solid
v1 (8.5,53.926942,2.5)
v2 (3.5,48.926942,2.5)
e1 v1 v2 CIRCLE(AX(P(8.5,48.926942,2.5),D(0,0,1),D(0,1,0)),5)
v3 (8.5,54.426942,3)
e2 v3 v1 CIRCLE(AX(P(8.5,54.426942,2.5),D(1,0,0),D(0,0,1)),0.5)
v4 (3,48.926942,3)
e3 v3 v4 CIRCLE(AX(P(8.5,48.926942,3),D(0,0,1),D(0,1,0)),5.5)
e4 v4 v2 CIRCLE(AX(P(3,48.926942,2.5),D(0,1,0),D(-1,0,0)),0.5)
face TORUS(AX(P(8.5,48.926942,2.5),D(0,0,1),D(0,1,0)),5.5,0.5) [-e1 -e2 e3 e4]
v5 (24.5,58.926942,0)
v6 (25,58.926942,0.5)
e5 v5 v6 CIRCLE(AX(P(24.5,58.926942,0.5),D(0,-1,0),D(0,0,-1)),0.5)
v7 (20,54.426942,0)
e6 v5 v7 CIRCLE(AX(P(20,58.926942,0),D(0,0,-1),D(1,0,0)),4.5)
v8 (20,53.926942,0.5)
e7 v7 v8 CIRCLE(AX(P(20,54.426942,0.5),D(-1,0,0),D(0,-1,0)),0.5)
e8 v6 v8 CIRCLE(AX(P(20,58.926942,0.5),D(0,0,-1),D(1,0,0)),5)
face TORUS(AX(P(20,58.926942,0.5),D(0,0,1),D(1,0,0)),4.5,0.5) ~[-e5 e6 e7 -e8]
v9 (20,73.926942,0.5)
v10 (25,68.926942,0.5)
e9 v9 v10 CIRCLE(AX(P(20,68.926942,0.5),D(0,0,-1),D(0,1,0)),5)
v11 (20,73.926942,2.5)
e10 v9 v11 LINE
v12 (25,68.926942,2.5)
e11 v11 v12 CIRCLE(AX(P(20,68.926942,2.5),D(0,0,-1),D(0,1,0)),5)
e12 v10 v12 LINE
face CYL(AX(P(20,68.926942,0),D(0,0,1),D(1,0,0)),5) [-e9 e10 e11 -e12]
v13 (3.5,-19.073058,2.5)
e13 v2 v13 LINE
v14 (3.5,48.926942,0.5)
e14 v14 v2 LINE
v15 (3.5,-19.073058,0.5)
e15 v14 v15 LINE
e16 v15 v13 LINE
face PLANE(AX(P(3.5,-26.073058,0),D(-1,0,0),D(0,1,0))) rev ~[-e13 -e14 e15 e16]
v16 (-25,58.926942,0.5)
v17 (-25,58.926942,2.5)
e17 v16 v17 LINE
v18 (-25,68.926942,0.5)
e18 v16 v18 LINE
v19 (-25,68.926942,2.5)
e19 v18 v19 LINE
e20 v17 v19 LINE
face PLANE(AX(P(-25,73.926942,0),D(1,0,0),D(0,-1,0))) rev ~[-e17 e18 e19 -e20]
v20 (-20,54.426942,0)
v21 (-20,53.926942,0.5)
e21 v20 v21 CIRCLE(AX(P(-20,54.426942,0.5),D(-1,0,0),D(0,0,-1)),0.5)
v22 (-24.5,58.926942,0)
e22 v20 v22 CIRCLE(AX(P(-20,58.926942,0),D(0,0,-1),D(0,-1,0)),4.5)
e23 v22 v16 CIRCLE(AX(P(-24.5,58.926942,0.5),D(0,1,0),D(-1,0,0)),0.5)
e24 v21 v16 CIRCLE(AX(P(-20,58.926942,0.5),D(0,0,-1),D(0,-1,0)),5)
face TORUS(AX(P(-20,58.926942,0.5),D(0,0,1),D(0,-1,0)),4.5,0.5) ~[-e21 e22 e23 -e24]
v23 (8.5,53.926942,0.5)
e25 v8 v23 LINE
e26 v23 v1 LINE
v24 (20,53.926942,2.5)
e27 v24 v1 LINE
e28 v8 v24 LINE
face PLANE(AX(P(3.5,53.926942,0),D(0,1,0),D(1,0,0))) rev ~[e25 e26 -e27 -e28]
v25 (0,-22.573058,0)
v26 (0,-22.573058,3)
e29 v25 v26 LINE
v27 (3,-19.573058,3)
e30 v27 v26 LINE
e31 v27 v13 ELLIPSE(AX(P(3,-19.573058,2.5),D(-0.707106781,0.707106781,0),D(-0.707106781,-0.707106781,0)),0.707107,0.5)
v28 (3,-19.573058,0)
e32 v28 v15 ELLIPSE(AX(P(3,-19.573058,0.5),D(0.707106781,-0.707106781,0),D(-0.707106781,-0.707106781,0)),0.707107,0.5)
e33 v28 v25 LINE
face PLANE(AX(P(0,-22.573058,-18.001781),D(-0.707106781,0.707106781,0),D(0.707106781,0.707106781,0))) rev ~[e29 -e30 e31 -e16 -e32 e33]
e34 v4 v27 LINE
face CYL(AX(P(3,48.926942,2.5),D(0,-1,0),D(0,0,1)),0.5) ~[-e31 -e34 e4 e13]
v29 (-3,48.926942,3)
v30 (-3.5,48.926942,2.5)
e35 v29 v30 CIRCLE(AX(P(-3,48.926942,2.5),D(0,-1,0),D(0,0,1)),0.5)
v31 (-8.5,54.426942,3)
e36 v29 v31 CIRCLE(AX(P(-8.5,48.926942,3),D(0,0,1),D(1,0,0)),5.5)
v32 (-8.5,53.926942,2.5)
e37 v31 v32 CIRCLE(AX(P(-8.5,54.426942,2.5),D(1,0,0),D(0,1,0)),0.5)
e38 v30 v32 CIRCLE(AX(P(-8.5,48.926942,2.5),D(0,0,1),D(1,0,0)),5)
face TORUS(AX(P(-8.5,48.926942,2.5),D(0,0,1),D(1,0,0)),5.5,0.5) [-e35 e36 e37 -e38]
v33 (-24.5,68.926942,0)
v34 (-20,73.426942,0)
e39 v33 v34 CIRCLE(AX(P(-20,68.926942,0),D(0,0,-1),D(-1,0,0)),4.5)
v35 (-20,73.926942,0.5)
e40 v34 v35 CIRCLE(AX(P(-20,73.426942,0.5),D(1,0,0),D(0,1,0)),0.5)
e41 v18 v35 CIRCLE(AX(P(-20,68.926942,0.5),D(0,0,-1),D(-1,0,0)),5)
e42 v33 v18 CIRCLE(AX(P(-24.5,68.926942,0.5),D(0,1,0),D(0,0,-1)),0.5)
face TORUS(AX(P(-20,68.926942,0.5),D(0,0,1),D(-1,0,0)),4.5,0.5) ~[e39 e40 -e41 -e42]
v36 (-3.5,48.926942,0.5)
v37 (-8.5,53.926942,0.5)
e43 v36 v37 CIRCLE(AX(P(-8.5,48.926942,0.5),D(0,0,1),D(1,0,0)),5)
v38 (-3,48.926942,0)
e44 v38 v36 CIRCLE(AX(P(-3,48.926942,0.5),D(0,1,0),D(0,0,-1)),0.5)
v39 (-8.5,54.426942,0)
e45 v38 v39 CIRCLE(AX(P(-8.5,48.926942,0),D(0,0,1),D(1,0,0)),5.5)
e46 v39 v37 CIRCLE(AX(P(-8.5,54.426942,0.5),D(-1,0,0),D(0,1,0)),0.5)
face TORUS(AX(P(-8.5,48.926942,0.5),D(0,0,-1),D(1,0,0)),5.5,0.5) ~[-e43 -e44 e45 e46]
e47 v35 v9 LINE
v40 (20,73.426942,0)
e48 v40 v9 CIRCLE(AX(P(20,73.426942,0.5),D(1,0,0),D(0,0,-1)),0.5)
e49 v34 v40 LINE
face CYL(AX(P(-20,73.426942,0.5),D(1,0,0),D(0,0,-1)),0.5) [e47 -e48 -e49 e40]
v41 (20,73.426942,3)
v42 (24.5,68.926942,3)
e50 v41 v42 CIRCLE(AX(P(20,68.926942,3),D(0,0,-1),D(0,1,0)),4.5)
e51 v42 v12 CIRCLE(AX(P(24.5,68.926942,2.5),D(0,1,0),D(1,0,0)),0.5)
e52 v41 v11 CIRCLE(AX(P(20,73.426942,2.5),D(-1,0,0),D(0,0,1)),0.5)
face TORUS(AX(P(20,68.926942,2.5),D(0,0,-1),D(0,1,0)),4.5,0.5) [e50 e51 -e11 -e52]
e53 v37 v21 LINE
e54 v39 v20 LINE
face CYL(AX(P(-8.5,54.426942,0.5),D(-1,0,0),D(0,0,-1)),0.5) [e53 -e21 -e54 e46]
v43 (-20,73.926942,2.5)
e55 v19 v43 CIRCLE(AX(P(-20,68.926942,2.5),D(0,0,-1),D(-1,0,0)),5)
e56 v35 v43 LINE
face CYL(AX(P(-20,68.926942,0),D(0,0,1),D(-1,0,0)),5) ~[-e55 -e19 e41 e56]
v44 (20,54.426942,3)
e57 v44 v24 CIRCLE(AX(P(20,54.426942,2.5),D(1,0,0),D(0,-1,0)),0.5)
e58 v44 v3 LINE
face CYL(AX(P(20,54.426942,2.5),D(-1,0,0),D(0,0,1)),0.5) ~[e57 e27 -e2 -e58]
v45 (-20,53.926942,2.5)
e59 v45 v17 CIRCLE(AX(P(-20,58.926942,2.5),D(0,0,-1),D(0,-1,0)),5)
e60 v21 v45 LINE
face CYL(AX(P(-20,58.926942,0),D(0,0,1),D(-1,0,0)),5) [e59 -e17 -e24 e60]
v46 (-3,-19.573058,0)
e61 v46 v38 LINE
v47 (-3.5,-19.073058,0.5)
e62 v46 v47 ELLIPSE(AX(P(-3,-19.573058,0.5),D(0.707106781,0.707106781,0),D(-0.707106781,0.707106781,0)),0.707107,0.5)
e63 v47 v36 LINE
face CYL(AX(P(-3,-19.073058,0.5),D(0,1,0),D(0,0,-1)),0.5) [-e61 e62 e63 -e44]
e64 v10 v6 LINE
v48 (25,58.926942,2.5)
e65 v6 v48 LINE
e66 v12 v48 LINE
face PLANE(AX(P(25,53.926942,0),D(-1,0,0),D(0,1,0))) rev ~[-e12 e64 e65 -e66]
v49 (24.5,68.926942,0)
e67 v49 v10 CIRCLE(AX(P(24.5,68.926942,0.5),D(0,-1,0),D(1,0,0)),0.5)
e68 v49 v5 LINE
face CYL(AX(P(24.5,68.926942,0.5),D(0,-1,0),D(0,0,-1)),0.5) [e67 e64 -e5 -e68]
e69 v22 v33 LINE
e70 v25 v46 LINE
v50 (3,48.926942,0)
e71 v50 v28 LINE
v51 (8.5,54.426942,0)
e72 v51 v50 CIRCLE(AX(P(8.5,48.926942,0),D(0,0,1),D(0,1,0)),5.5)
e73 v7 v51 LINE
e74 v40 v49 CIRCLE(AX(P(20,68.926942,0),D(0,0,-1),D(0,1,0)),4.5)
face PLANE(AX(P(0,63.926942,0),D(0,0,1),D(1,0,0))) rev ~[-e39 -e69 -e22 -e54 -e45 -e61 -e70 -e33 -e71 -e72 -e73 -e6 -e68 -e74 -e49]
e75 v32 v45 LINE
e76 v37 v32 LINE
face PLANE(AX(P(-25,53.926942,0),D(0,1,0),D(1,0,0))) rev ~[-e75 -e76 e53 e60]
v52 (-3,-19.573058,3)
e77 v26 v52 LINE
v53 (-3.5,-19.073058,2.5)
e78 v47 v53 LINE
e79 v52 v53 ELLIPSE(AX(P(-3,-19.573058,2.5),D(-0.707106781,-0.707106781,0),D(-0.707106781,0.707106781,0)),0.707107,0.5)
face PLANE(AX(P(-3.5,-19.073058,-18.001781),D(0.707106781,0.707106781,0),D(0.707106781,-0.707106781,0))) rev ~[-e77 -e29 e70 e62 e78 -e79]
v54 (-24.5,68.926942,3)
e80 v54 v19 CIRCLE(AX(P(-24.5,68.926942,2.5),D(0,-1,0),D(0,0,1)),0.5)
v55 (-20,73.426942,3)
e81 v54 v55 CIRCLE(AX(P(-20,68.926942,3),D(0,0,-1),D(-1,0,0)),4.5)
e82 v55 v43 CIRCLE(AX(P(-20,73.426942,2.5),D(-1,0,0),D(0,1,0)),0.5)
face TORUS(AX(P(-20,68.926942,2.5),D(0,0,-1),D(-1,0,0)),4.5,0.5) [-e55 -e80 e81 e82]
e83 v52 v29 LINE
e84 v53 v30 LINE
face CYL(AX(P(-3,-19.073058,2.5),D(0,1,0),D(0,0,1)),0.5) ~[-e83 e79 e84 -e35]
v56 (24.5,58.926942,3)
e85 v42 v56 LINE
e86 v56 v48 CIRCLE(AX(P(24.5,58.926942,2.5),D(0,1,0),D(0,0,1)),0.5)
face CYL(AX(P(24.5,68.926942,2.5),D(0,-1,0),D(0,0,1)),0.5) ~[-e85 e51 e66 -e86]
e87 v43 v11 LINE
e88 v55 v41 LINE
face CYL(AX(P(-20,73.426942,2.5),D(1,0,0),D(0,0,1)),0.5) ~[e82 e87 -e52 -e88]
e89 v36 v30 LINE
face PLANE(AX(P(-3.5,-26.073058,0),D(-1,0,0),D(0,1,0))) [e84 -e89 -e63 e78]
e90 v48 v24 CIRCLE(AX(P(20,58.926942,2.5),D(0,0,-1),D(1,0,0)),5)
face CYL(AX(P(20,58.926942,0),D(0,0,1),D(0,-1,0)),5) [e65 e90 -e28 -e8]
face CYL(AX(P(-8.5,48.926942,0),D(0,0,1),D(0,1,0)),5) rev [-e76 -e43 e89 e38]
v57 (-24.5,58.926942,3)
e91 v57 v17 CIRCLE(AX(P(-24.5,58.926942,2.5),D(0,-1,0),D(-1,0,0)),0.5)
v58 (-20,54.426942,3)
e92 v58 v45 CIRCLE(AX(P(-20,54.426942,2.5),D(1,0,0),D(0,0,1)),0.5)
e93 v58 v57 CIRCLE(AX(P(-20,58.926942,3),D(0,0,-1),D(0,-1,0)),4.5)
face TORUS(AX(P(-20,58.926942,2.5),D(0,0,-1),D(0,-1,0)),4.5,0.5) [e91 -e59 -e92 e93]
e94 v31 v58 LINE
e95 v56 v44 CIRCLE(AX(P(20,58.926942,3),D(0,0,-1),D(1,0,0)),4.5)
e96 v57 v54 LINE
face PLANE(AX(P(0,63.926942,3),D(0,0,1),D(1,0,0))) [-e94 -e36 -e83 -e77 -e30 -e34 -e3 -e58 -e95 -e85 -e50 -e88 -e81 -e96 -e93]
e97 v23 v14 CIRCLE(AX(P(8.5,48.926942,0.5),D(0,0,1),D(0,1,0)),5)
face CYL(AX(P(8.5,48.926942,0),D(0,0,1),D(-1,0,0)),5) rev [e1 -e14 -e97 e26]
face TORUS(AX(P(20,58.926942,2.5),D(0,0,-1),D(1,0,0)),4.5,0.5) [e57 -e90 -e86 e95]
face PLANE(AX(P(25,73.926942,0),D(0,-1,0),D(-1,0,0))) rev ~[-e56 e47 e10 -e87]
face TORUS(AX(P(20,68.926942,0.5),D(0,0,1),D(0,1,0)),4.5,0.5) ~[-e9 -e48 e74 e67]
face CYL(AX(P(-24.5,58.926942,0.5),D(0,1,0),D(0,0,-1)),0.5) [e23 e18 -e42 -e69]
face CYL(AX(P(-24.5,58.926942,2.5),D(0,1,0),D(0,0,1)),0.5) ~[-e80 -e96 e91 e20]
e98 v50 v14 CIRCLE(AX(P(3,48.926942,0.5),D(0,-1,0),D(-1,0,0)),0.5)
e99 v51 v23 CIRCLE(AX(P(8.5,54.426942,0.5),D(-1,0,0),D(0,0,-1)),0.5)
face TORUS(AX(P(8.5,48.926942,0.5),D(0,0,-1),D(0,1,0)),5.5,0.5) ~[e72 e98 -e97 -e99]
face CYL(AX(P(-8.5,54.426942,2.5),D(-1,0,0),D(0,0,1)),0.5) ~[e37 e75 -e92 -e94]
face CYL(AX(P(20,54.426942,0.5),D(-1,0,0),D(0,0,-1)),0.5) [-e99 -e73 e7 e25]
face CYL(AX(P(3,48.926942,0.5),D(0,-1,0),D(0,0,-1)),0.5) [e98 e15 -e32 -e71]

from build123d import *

# Parameters (mm, degrees)
F0_W        = 7
F0_H        = 80
F1_DEPTH    = 3
F2_R        = 5
F3_T1_DEPTH = 39.0035618315
F4_R        = 0.5


# Not quite as in the source:
# - a fillet or chamfer that OpenCascade refuses, or shapes differently, is made with other operations: its cross-section is extruded or revolved along the edge and cut away or added


with BuildPart() as f1:
    # F0 (on Top) → F1 (new body)
    with BuildSketch(Plane.XY):
        Polygon((-25, 73.9269424736), (-25, 53.9269424736), (-3.5, 53.9269424736), (3.5, 53.9269424736), (25, 53.9269424736), (25, 73.9269424736), align=None)
        with Locations((0, 13.9269424736)):
            Rectangle(F0_W, F0_H)
    extrude(amount=F1_DEPTH)

    # F2
    f2_edges = [f1.edges().sort_by_distance(p)[0] for p in [
        (-25, 73.926942, 1.5),
        (25, 73.926942, 1.5),
        (25, 53.926942, 1.5),
        (3.5, 53.926942, 1.5),
        (-3.5, 53.926942, 1.5),
        (-25, 53.926942, 1.5),
    ]]
    fillet(f2_edges, radius=F2_R)

    # F3: chamfer of 7 on 2 edges, made by hand

    # F3_s2 → F3_t1 (cut)
    with BuildSketch(Plane.XY.offset(-18.0017809158)):
        Polygon((-3.5, -19.0730575264), (3.5, -26.0730575264), (-3.5, -26.0730575264), align=None)
        Polygon((-3.5, -26.0730575264), (3.5, -19.0730575264), (3.5, -26.0730575264), align=None)
    extrude(amount=F3_T1_DEPTH, mode=Mode.SUBTRACT)

    # F4
    f4_edges = [f1.edges().sort_by_distance(p)[0] for p in [
        (-3.5, 14.926942, 3),
        (-3.5, 14.926942, 0),
    ]]
    fillet(f4_edges, radius=F4_R)


solid = f1.part
